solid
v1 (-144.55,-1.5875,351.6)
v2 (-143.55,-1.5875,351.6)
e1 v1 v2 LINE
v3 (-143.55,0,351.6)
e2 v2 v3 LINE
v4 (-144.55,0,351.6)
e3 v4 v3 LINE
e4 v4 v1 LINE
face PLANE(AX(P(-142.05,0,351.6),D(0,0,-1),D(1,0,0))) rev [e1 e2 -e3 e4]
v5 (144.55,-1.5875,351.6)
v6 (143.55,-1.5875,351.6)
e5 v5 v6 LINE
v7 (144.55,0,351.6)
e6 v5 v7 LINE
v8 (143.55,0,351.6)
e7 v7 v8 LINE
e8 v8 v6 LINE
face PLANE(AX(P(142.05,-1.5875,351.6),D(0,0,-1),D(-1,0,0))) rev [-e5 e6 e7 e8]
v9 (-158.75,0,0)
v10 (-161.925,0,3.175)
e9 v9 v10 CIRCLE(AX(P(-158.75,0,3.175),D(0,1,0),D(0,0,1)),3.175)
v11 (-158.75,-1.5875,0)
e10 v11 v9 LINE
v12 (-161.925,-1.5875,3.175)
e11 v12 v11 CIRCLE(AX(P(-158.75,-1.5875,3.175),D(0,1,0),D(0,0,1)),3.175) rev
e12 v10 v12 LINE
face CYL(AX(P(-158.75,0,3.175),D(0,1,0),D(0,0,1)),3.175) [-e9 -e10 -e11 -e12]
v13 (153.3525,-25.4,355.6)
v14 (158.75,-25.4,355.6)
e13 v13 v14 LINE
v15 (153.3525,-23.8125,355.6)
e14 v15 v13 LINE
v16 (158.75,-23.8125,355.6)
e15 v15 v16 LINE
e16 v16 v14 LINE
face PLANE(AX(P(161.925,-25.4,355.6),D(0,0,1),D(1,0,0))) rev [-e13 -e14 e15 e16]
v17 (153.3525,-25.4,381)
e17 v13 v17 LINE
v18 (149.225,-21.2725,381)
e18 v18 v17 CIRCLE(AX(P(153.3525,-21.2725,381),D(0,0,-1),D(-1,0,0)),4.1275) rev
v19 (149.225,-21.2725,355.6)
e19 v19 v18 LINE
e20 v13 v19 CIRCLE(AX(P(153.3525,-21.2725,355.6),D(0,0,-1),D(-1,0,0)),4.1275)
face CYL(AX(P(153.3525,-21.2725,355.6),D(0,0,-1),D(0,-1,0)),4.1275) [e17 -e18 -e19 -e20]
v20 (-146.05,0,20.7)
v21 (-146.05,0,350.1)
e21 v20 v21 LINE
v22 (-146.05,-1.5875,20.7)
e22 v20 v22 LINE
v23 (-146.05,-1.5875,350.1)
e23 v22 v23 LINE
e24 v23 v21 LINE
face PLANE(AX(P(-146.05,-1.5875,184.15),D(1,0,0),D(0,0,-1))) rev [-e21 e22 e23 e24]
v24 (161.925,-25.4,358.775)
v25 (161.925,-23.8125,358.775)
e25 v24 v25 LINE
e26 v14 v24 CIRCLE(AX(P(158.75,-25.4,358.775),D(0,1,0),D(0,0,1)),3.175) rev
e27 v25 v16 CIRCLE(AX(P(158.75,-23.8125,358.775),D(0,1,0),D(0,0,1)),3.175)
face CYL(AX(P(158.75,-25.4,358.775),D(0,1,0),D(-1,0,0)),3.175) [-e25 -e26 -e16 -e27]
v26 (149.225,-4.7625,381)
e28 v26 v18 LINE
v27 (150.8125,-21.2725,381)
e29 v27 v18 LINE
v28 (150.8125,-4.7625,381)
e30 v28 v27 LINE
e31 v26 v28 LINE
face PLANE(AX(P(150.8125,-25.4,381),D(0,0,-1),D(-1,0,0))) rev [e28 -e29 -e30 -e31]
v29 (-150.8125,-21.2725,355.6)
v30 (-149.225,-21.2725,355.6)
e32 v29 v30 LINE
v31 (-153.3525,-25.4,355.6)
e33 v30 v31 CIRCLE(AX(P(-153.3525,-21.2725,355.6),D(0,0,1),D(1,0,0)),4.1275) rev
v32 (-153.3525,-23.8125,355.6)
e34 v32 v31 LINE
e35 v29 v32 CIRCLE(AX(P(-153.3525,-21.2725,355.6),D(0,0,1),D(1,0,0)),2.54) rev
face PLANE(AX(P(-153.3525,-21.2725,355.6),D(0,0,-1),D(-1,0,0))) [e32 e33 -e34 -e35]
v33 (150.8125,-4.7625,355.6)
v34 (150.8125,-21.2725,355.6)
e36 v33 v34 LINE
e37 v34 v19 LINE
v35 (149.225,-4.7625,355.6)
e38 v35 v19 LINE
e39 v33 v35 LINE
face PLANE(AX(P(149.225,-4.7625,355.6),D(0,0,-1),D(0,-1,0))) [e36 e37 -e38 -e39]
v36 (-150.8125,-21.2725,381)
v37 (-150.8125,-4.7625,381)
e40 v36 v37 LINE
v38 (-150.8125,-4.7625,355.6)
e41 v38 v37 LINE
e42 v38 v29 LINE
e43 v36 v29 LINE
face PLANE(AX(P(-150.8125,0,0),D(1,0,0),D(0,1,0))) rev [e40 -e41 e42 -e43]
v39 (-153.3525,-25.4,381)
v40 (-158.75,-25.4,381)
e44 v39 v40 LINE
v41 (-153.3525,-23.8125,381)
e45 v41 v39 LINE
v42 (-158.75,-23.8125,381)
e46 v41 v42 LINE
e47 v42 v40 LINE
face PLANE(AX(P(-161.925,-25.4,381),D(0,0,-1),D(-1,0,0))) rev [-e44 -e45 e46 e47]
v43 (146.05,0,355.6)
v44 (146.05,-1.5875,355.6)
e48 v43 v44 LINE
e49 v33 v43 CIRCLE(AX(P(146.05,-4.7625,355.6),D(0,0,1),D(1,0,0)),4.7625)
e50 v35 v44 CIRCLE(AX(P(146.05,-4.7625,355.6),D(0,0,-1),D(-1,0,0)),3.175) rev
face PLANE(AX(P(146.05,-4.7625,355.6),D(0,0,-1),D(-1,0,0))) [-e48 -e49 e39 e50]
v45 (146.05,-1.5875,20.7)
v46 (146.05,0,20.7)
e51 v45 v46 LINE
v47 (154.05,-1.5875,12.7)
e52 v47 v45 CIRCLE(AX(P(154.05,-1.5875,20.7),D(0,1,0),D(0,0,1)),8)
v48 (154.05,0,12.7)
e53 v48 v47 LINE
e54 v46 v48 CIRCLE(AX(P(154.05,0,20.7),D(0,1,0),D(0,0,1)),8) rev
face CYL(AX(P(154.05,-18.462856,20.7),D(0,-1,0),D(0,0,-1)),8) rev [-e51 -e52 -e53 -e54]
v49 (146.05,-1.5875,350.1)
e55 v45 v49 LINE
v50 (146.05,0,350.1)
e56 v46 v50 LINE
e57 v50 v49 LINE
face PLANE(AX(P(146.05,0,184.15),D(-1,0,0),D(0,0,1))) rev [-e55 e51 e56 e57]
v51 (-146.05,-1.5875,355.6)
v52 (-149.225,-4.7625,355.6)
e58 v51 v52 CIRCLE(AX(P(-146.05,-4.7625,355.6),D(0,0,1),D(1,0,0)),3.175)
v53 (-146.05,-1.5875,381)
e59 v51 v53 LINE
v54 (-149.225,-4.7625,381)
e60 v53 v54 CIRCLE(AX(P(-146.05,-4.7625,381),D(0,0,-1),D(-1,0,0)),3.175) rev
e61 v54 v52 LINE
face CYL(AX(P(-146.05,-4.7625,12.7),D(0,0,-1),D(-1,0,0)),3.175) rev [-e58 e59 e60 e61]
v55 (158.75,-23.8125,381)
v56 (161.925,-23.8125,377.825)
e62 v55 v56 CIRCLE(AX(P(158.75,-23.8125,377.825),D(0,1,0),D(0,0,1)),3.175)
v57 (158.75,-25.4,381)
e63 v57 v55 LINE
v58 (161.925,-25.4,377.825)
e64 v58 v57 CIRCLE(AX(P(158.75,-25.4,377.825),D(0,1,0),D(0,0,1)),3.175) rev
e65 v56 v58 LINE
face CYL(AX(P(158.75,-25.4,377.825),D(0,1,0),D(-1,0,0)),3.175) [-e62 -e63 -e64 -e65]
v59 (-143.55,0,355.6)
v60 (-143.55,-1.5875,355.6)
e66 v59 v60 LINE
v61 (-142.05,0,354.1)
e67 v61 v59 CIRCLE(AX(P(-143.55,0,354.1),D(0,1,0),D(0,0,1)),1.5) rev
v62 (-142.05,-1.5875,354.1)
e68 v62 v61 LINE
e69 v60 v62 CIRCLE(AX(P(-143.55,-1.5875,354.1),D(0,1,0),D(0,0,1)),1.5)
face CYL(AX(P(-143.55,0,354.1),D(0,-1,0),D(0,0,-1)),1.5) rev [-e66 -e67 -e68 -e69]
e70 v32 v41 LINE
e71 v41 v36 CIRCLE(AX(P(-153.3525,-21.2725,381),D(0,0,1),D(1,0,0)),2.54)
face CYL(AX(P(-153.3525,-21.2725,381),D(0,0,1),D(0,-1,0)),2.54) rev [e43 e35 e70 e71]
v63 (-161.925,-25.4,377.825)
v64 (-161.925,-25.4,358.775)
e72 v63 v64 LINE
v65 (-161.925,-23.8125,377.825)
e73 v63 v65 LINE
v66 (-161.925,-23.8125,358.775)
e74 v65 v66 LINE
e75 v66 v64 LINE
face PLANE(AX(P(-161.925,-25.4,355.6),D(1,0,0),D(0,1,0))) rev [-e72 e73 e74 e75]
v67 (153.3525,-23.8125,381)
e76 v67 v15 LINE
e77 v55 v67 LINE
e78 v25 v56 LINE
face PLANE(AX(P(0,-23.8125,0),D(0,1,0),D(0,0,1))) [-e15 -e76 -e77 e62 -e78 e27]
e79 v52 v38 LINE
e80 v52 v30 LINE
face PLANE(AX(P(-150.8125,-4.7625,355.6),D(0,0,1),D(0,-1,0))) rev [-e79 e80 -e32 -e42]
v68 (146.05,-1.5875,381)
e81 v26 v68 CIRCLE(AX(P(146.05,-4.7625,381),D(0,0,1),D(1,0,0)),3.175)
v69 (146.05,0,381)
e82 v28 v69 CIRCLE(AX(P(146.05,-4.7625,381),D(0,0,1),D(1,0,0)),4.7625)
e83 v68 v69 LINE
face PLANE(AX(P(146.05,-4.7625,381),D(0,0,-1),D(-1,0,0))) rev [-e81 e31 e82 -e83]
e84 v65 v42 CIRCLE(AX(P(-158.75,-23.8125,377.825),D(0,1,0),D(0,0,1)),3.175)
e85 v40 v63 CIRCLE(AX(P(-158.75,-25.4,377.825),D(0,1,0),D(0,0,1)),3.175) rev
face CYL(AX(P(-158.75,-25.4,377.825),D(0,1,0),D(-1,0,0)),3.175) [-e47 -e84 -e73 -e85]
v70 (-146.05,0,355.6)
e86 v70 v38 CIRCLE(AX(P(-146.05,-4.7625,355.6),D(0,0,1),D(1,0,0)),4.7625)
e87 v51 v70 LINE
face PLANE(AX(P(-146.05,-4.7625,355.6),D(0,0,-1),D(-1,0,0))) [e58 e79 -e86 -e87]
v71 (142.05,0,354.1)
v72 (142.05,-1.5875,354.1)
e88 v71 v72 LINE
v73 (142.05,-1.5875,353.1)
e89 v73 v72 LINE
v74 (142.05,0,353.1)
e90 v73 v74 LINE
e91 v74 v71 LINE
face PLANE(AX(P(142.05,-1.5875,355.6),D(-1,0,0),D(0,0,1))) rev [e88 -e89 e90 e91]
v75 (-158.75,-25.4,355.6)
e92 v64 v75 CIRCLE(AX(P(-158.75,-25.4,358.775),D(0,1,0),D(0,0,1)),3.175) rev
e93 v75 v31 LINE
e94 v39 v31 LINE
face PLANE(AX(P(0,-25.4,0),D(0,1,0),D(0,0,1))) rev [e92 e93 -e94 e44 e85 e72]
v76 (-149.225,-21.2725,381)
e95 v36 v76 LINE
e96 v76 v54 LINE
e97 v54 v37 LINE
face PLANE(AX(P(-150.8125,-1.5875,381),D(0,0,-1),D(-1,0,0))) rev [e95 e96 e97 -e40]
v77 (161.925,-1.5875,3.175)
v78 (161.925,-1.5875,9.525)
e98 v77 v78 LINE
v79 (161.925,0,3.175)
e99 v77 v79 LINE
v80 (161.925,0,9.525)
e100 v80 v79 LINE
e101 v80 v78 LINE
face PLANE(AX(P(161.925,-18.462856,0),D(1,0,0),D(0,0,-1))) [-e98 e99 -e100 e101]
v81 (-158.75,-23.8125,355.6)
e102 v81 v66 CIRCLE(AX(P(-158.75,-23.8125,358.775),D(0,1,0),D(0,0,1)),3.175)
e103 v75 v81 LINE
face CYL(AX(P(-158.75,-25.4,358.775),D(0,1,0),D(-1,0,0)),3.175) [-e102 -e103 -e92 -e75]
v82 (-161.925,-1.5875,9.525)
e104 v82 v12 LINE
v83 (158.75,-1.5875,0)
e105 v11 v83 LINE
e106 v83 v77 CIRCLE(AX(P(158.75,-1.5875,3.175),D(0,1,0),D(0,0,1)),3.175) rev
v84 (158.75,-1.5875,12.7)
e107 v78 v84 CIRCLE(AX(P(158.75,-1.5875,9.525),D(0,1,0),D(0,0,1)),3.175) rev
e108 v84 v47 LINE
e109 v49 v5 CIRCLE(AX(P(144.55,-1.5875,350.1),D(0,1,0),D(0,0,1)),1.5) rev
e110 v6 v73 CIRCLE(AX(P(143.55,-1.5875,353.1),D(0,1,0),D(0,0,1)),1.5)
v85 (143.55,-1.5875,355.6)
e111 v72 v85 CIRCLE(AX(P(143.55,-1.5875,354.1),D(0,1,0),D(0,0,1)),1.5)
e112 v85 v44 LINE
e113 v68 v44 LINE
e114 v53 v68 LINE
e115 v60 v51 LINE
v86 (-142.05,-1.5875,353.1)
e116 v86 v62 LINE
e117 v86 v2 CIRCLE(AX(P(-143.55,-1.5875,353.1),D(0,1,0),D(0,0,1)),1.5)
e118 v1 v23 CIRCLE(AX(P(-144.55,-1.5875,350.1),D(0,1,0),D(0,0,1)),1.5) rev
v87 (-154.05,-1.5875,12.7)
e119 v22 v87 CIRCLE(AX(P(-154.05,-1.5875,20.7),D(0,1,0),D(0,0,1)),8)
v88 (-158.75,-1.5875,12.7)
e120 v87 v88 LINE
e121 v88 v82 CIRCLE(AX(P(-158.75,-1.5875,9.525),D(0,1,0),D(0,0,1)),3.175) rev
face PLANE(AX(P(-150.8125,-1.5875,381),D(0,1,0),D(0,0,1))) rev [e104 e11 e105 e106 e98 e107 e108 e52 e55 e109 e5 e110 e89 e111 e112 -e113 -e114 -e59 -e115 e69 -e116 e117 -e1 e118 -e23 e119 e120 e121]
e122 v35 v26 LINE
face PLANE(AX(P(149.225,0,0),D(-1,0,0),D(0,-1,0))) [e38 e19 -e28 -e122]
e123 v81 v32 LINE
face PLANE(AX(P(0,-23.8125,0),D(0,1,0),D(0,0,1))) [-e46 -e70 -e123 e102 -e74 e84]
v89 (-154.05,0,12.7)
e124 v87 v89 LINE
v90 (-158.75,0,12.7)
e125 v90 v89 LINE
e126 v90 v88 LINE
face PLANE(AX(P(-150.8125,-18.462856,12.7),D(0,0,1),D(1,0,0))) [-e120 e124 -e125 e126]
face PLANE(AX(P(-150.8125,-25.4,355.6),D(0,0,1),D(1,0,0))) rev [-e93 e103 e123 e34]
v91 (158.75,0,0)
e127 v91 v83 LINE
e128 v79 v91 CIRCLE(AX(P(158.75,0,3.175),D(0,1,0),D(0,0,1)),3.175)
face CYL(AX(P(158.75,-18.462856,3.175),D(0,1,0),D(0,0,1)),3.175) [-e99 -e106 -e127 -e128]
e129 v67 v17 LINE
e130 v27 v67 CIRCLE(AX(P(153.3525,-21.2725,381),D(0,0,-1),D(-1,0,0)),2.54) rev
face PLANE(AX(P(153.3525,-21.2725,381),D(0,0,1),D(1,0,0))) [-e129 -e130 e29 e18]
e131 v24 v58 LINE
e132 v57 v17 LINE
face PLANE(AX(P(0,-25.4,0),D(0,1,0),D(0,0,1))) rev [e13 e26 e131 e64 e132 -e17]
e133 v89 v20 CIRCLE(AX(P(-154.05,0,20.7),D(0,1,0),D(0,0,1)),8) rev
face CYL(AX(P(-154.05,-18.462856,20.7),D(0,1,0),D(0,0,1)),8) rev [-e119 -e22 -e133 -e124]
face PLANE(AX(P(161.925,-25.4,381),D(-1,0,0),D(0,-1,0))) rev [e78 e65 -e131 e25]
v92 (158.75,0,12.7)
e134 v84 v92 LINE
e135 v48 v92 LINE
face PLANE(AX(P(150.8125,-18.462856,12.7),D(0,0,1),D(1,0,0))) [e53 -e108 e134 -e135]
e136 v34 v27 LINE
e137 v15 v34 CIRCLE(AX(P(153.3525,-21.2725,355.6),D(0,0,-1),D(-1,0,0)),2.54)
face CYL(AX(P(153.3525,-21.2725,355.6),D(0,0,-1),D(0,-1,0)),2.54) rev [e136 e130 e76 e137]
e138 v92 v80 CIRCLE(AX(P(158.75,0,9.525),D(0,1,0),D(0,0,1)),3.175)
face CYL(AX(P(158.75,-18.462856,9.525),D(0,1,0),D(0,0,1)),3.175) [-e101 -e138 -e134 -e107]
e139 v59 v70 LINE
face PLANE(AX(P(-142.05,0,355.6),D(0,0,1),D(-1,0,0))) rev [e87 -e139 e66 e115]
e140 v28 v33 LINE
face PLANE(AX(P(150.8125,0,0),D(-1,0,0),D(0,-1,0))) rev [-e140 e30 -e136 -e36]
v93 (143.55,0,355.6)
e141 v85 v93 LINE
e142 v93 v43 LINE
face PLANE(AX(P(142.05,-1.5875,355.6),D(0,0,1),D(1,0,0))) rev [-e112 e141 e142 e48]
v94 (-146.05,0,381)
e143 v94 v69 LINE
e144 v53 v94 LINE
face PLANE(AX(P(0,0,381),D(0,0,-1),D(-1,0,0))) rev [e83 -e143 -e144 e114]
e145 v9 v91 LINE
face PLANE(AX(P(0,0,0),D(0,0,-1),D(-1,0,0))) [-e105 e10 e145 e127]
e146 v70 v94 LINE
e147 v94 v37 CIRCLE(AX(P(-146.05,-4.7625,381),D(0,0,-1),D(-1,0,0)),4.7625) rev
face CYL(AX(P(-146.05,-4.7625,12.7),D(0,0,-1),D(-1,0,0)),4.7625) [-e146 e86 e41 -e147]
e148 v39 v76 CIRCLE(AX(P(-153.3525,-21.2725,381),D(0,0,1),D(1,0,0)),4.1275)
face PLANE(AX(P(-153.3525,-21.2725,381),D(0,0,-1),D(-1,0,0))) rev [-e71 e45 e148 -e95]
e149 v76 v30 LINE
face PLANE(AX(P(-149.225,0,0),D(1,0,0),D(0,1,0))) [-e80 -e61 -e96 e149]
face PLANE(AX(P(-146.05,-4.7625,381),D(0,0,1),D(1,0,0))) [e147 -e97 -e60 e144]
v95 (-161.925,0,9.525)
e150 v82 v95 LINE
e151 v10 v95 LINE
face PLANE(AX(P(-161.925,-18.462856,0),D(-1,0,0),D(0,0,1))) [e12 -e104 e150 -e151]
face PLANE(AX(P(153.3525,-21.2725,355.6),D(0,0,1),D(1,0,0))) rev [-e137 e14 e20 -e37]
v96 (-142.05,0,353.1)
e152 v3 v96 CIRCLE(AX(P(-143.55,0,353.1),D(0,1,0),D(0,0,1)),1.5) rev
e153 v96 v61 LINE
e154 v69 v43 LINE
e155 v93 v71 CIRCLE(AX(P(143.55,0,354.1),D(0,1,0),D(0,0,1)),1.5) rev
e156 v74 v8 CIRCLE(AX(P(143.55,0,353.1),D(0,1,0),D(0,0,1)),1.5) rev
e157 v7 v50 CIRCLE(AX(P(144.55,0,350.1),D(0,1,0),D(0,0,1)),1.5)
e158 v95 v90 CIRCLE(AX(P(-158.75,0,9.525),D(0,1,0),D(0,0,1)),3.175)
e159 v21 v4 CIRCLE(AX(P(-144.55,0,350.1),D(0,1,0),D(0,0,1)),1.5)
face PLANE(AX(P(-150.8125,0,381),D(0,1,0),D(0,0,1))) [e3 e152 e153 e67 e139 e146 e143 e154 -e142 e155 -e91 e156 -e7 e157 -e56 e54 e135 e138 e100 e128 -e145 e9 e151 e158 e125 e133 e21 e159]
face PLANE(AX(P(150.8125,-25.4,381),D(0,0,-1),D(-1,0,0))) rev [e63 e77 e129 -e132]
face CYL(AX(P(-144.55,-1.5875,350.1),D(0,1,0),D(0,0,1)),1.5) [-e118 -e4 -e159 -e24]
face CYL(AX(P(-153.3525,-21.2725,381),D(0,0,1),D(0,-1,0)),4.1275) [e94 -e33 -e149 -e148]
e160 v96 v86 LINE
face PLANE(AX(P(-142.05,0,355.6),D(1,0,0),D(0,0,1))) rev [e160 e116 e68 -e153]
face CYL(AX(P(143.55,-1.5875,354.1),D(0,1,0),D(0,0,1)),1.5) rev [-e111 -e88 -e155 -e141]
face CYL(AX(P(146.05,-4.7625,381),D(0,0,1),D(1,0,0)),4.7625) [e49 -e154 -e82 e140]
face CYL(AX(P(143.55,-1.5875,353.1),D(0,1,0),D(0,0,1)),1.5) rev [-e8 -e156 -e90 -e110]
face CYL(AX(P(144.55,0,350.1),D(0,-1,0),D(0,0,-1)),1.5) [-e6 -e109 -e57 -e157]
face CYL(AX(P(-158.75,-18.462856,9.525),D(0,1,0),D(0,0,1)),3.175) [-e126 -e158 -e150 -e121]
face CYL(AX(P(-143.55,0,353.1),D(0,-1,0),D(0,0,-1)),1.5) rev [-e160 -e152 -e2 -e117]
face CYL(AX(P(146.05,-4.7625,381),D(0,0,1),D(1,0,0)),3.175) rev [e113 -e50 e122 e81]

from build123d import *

# Parameters (mm, degrees)
SKETCH5_W                      = 301.625
SKETCH5_H                      = 1.5875
BASE_FLANGE1_DEPTH             = 381
SKETCH10_W                     = 11.1125
SKETCH10_H                     = 12.7
BOSS_EXTRUDE1_DEPTH            = 1.5875
EDGE_FLANGE1_STRIP_W           = 12.7
EDGE_FLANGE1_STRIP_H           = 1.5875
EDGE_FLANGE1_STRIP_CUT_DEPTH   = 368.3
EDGE_FLANGE1_STRIP_2_W         = 12.7
EDGE_FLANGE1_STRIP_2_H         = 1.5875
EDGE_FLANGE1_STRIP_CUT_2_DEPTH = 368.3
EDGE_FLANGE1_DEPTH             = 368.3
EDGE_FLANGE1_BEND_DEPTH        = 368.3
CUT_EXTRUDE1_START             = -25.4
CUT_EXTRUDE1_DEPTH             = 342.9
EDGE_FLANGE2_STRIP_W           = 11.43
EDGE_FLANGE2_STRIP_H           = 1.5875
EDGE_FLANGE2_STRIP_CUT_DEPTH   = 25.4
EDGE_FLANGE2_DEPTH             = 25.4
EDGE_FLANGE3_STRIP_W           = 11.43
EDGE_FLANGE3_STRIP_H           = 1.5875
EDGE_FLANGE3_STRIP_CUT_DEPTH   = 25.4
EDGE_FLANGE3_DEPTH             = 25.4
FILLET1_R                      = 8
FILLET2_R                      = 3.175
SKETCH30_W                     = 4
SKETCH30_H                     = 1.5875
CUT_EXTRUDE9_DEPTH             = 4
SKETCH31_W                     = 4
SKETCH31_H                     = 1.5875
CUT_EXTRUDE10_DEPTH            = 4
FILLET4_R                      = 1.5


# Sheet-metal steps are written as plain solids
with BuildPart() as part:
    # Sketch5 → Base-Flange1 (new body)
    with BuildSketch(Plane.XY):
        with Locations((0, -0.79375)):
            Rectangle(SKETCH5_W, SKETCH5_H)
    extrude(amount=BASE_FLANGE1_DEPTH)

    # Sketch10 → Boss-Extrude1 (add)
    with BuildSketch(Plane(origin=(0, 0, 0), x_dir=(1, 0, 0), z_dir=(0, 1, 0))):
        with Locations((-156.36875, -6.35)):
            Rectangle(SKETCH10_W, SKETCH10_H)
        with Locations((156.36875, -6.35)):
            Rectangle(SKETCH10_W, SKETCH10_H)
    extrude(amount=-BOSS_EXTRUDE1_DEPTH)

    # Edge-Flange1 strip (across the edge) → Edge-Flange1 strip cut (cut)
    with BuildSketch(Plane(origin=(150.8125, -1.5875, 12.7), x_dir=(-1, 0, 0), z_dir=(0, 0, 1))):
        with Locations((-1.5875, -0.79375)):
            Rectangle(EDGE_FLANGE1_STRIP_W, EDGE_FLANGE1_STRIP_H)
    extrude(amount=EDGE_FLANGE1_STRIP_CUT_DEPTH, mode=Mode.SUBTRACT)

    # Edge-Flange1 strip 2 (across the edge) → Edge-Flange1 strip cut 2 (cut)
    with BuildSketch(Plane(origin=(-150.8125, -1.5875, 381), x_dir=(1, 0, 0), z_dir=(0, 0, -1))):
        with Locations((-1.5875, -0.79375)):
            Rectangle(EDGE_FLANGE1_STRIP_2_W, EDGE_FLANGE1_STRIP_2_H)
    extrude(amount=EDGE_FLANGE1_STRIP_CUT_2_DEPTH, mode=Mode.SUBTRACT)

    # Edge-Flange1 section (across the edge) → Edge-Flange1 (add)
    with BuildSketch(Plane(origin=(150.8125, -1.5875, 12.7), x_dir=(-1, 0, 0), z_dir=(0, 0, 1))):
        with BuildLine():
            Line((0, 3.175), (0, 23.8125))
            Line((0, 23.8125), (1.5875, 23.8125))
            Line((1.5875, 23.8125), (1.5875, 3.175))
            ThreePointArc((1.5875, 3.175), (2.51743597, 0.92993597), (4.7625, 0))
            Line((4.7625, 0), (4.7625, -1.5875))
            ThreePointArc((4.7625, -1.5875), (1.394903955, -0.192596045), (0, 3.175))
        make_face()
    extrude(amount=EDGE_FLANGE1_DEPTH)

    # Edge-Flange1 section 2 (across the edge) → Edge-Flange1 bend (add)
    with BuildSketch(Plane(origin=(-150.8125, -1.5875, 381), x_dir=(1, 0, 0), z_dir=(0, 0, -1))):
        with BuildLine():
            Line((0, 3.175), (0, 23.8125))
            Line((0, 23.8125), (1.5875, 23.8125))
            Line((1.5875, 23.8125), (1.5875, 3.175))
            ThreePointArc((1.5875, 3.175), (2.51743597, 0.92993597), (4.7625, 0))
            Line((4.7625, 0), (4.7625, -1.5875))
            ThreePointArc((4.7625, -1.5875), (1.394903955, -0.192596045), (0, 3.175))
        make_face()
    extrude(amount=EDGE_FLANGE1_BEND_DEPTH)

    # Sketch20 → Cut-Extrude1 (cut)
    with BuildSketch(Plane.XY.offset(381).offset(CUT_EXTRUDE1_START)):
        with BuildLine():
            Line((-150.8125, -4.7625), (-150.8125, -25.4))
            Line((-150.8125, -25.4), (-149.225, -25.4))
            Line((-149.225, -25.4), (-149.225, -4.7625))
            ThreePointArc((-149.225, -4.7625), (-148.29506403, -2.51743597), (-146.05, -1.5875))
            Line((-146.05, -1.5875), (-146.05, 0))
            ThreePointArc((-146.05, 0), (-149.417596045, -1.394903955), (-150.8125, -4.7625))
        make_face()
        with BuildLine():
            Line((149.225, -4.7625), (149.225, -25.4))
            Line((149.225, -25.4), (150.8125, -25.4))
            Line((150.8125, -25.4), (150.8125, -4.7625))
            ThreePointArc((150.8125, -4.7625), (149.417596045, -1.394903955), (146.05, 0))
            Line((146.05, 0), (146.05, -1.5875))
            ThreePointArc((146.05, -1.5875), (148.29506403, -2.51743597), (149.225, -4.7625))
        make_face()
    extrude(amount=-CUT_EXTRUDE1_DEPTH, mode=Mode.SUBTRACT)

    # Edge-Flange2 strip (across the edge) → Edge-Flange2 strip cut (cut)
    with BuildSketch(Plane(origin=(-150.8125, -25.4, 355.6), x_dir=(0, 1, 0), z_dir=(0, 0, 1))):
        with Locations((-1.5875, -0.79375)):
            Rectangle(EDGE_FLANGE2_STRIP_W, EDGE_FLANGE2_STRIP_H)
    extrude(amount=EDGE_FLANGE2_STRIP_CUT_DEPTH, mode=Mode.SUBTRACT)

    # Edge-Flange2 section (across the edge) → Edge-Flange2 (add)
    with BuildSketch(Plane(origin=(-150.8125, -25.4, 355.6), x_dir=(0, 1, 0), z_dir=(0, 0, 1))):
        with BuildLine():
            Line((0, 2.54), (0, 11.1125))
            Line((0, 11.1125), (1.5875, 11.1125))
            Line((1.5875, 11.1125), (1.5875, 2.54))
            ThreePointArc((1.5875, 2.54), (2.331448776, 0.743948776), (4.1275, 0))
            Line((4.1275, 0), (4.1275, -1.5875))
            ThreePointArc((4.1275, -1.5875), (1.208916761, -0.378583239), (0, 2.54))
        make_face()
    extrude(amount=EDGE_FLANGE2_DEPTH)

    # Edge-Flange3 strip (across the edge) → Edge-Flange3 strip cut (cut)
    with BuildSketch(Plane(origin=(150.8125, -25.4, 381), x_dir=(0, 1, 0), z_dir=(0, 0, -1))):
        with Locations((-1.5875, -0.79375)):
            Rectangle(EDGE_FLANGE3_STRIP_W, EDGE_FLANGE3_STRIP_H)
    extrude(amount=EDGE_FLANGE3_STRIP_CUT_DEPTH, mode=Mode.SUBTRACT)

    # Edge-Flange3 section (across the edge) → Edge-Flange3 (add)
    with BuildSketch(Plane(origin=(150.8125, -25.4, 381), x_dir=(0, 1, 0), z_dir=(0, 0, -1))):
        with BuildLine():
            Line((0, 2.54), (0, 11.1125))
            Line((0, 11.1125), (1.5875, 11.1125))
            Line((1.5875, 11.1125), (1.5875, 2.54))
            ThreePointArc((1.5875, 2.54), (2.331448776, 0.743948776), (4.1275, 0))
            Line((4.1275, 0), (4.1275, -1.5875))
            ThreePointArc((4.1275, -1.5875), (1.208916761, -0.378583239), (0, 2.54))
        make_face()
    extrude(amount=EDGE_FLANGE3_DEPTH)

    # Fillet1
    fillet1_edges = [part.edges().sort_by_distance(p)[0] for p in [
        (-146.05, -0.79375, 12.7),
        (146.05, -0.79375, 12.7),
    ]]
    fillet(fillet1_edges, radius=FILLET1_R)

    # Fillet2
    fillet2_edges = [part.edges().sort_by_distance(p)[0] for p in [
        (-161.925, -0.79375, 12.7),
        (-161.925, -0.79375, 0),
        (-161.925, -24.60625, 355.6),
        (-161.925, -24.60625, 381),
        (161.925, -24.60625, 381),
        (161.925, -24.60625, 355.6),
        (161.925, -0.79375, 0),
        (161.925, -0.79375, 12.7),
    ]]
    fillet(fillet2_edges, radius=FILLET2_R)

    # Sketch30 → Cut-Extrude9 (cut)
    with BuildSketch(Plane.ZY.offset(146.05)):
        with Locations((353.6, -0.79375)):
            Rectangle(SKETCH30_W, SKETCH30_H)
    extrude(amount=-CUT_EXTRUDE9_DEPTH, mode=Mode.SUBTRACT)

    # Sketch31 → Cut-Extrude10 (cut)
    with BuildSketch(Plane(origin=(146.05, 0, 0), x_dir=(0, 0, -1), z_dir=(1, 0, 0))):
        with Locations((-353.6, -0.79375)):
            Rectangle(SKETCH31_W, SKETCH31_H)
    extrude(amount=-CUT_EXTRUDE10_DEPTH, mode=Mode.SUBTRACT)

    # Fillet4
    fillet4_edges = [part.edges().sort_by_distance(p)[0] for p in [
        (-146.05, -0.79375, 351.6),
        (-142.05, -0.79375, 351.6),
        (-142.05, -0.79375, 355.6),
        (146.05, -0.79375, 351.6),
        (142.05, -0.79375, 351.6),
        (142.05, -0.79375, 355.6),
    ]]
    fillet(fillet4_edges, radius=FILLET4_R)


solid = part.part
